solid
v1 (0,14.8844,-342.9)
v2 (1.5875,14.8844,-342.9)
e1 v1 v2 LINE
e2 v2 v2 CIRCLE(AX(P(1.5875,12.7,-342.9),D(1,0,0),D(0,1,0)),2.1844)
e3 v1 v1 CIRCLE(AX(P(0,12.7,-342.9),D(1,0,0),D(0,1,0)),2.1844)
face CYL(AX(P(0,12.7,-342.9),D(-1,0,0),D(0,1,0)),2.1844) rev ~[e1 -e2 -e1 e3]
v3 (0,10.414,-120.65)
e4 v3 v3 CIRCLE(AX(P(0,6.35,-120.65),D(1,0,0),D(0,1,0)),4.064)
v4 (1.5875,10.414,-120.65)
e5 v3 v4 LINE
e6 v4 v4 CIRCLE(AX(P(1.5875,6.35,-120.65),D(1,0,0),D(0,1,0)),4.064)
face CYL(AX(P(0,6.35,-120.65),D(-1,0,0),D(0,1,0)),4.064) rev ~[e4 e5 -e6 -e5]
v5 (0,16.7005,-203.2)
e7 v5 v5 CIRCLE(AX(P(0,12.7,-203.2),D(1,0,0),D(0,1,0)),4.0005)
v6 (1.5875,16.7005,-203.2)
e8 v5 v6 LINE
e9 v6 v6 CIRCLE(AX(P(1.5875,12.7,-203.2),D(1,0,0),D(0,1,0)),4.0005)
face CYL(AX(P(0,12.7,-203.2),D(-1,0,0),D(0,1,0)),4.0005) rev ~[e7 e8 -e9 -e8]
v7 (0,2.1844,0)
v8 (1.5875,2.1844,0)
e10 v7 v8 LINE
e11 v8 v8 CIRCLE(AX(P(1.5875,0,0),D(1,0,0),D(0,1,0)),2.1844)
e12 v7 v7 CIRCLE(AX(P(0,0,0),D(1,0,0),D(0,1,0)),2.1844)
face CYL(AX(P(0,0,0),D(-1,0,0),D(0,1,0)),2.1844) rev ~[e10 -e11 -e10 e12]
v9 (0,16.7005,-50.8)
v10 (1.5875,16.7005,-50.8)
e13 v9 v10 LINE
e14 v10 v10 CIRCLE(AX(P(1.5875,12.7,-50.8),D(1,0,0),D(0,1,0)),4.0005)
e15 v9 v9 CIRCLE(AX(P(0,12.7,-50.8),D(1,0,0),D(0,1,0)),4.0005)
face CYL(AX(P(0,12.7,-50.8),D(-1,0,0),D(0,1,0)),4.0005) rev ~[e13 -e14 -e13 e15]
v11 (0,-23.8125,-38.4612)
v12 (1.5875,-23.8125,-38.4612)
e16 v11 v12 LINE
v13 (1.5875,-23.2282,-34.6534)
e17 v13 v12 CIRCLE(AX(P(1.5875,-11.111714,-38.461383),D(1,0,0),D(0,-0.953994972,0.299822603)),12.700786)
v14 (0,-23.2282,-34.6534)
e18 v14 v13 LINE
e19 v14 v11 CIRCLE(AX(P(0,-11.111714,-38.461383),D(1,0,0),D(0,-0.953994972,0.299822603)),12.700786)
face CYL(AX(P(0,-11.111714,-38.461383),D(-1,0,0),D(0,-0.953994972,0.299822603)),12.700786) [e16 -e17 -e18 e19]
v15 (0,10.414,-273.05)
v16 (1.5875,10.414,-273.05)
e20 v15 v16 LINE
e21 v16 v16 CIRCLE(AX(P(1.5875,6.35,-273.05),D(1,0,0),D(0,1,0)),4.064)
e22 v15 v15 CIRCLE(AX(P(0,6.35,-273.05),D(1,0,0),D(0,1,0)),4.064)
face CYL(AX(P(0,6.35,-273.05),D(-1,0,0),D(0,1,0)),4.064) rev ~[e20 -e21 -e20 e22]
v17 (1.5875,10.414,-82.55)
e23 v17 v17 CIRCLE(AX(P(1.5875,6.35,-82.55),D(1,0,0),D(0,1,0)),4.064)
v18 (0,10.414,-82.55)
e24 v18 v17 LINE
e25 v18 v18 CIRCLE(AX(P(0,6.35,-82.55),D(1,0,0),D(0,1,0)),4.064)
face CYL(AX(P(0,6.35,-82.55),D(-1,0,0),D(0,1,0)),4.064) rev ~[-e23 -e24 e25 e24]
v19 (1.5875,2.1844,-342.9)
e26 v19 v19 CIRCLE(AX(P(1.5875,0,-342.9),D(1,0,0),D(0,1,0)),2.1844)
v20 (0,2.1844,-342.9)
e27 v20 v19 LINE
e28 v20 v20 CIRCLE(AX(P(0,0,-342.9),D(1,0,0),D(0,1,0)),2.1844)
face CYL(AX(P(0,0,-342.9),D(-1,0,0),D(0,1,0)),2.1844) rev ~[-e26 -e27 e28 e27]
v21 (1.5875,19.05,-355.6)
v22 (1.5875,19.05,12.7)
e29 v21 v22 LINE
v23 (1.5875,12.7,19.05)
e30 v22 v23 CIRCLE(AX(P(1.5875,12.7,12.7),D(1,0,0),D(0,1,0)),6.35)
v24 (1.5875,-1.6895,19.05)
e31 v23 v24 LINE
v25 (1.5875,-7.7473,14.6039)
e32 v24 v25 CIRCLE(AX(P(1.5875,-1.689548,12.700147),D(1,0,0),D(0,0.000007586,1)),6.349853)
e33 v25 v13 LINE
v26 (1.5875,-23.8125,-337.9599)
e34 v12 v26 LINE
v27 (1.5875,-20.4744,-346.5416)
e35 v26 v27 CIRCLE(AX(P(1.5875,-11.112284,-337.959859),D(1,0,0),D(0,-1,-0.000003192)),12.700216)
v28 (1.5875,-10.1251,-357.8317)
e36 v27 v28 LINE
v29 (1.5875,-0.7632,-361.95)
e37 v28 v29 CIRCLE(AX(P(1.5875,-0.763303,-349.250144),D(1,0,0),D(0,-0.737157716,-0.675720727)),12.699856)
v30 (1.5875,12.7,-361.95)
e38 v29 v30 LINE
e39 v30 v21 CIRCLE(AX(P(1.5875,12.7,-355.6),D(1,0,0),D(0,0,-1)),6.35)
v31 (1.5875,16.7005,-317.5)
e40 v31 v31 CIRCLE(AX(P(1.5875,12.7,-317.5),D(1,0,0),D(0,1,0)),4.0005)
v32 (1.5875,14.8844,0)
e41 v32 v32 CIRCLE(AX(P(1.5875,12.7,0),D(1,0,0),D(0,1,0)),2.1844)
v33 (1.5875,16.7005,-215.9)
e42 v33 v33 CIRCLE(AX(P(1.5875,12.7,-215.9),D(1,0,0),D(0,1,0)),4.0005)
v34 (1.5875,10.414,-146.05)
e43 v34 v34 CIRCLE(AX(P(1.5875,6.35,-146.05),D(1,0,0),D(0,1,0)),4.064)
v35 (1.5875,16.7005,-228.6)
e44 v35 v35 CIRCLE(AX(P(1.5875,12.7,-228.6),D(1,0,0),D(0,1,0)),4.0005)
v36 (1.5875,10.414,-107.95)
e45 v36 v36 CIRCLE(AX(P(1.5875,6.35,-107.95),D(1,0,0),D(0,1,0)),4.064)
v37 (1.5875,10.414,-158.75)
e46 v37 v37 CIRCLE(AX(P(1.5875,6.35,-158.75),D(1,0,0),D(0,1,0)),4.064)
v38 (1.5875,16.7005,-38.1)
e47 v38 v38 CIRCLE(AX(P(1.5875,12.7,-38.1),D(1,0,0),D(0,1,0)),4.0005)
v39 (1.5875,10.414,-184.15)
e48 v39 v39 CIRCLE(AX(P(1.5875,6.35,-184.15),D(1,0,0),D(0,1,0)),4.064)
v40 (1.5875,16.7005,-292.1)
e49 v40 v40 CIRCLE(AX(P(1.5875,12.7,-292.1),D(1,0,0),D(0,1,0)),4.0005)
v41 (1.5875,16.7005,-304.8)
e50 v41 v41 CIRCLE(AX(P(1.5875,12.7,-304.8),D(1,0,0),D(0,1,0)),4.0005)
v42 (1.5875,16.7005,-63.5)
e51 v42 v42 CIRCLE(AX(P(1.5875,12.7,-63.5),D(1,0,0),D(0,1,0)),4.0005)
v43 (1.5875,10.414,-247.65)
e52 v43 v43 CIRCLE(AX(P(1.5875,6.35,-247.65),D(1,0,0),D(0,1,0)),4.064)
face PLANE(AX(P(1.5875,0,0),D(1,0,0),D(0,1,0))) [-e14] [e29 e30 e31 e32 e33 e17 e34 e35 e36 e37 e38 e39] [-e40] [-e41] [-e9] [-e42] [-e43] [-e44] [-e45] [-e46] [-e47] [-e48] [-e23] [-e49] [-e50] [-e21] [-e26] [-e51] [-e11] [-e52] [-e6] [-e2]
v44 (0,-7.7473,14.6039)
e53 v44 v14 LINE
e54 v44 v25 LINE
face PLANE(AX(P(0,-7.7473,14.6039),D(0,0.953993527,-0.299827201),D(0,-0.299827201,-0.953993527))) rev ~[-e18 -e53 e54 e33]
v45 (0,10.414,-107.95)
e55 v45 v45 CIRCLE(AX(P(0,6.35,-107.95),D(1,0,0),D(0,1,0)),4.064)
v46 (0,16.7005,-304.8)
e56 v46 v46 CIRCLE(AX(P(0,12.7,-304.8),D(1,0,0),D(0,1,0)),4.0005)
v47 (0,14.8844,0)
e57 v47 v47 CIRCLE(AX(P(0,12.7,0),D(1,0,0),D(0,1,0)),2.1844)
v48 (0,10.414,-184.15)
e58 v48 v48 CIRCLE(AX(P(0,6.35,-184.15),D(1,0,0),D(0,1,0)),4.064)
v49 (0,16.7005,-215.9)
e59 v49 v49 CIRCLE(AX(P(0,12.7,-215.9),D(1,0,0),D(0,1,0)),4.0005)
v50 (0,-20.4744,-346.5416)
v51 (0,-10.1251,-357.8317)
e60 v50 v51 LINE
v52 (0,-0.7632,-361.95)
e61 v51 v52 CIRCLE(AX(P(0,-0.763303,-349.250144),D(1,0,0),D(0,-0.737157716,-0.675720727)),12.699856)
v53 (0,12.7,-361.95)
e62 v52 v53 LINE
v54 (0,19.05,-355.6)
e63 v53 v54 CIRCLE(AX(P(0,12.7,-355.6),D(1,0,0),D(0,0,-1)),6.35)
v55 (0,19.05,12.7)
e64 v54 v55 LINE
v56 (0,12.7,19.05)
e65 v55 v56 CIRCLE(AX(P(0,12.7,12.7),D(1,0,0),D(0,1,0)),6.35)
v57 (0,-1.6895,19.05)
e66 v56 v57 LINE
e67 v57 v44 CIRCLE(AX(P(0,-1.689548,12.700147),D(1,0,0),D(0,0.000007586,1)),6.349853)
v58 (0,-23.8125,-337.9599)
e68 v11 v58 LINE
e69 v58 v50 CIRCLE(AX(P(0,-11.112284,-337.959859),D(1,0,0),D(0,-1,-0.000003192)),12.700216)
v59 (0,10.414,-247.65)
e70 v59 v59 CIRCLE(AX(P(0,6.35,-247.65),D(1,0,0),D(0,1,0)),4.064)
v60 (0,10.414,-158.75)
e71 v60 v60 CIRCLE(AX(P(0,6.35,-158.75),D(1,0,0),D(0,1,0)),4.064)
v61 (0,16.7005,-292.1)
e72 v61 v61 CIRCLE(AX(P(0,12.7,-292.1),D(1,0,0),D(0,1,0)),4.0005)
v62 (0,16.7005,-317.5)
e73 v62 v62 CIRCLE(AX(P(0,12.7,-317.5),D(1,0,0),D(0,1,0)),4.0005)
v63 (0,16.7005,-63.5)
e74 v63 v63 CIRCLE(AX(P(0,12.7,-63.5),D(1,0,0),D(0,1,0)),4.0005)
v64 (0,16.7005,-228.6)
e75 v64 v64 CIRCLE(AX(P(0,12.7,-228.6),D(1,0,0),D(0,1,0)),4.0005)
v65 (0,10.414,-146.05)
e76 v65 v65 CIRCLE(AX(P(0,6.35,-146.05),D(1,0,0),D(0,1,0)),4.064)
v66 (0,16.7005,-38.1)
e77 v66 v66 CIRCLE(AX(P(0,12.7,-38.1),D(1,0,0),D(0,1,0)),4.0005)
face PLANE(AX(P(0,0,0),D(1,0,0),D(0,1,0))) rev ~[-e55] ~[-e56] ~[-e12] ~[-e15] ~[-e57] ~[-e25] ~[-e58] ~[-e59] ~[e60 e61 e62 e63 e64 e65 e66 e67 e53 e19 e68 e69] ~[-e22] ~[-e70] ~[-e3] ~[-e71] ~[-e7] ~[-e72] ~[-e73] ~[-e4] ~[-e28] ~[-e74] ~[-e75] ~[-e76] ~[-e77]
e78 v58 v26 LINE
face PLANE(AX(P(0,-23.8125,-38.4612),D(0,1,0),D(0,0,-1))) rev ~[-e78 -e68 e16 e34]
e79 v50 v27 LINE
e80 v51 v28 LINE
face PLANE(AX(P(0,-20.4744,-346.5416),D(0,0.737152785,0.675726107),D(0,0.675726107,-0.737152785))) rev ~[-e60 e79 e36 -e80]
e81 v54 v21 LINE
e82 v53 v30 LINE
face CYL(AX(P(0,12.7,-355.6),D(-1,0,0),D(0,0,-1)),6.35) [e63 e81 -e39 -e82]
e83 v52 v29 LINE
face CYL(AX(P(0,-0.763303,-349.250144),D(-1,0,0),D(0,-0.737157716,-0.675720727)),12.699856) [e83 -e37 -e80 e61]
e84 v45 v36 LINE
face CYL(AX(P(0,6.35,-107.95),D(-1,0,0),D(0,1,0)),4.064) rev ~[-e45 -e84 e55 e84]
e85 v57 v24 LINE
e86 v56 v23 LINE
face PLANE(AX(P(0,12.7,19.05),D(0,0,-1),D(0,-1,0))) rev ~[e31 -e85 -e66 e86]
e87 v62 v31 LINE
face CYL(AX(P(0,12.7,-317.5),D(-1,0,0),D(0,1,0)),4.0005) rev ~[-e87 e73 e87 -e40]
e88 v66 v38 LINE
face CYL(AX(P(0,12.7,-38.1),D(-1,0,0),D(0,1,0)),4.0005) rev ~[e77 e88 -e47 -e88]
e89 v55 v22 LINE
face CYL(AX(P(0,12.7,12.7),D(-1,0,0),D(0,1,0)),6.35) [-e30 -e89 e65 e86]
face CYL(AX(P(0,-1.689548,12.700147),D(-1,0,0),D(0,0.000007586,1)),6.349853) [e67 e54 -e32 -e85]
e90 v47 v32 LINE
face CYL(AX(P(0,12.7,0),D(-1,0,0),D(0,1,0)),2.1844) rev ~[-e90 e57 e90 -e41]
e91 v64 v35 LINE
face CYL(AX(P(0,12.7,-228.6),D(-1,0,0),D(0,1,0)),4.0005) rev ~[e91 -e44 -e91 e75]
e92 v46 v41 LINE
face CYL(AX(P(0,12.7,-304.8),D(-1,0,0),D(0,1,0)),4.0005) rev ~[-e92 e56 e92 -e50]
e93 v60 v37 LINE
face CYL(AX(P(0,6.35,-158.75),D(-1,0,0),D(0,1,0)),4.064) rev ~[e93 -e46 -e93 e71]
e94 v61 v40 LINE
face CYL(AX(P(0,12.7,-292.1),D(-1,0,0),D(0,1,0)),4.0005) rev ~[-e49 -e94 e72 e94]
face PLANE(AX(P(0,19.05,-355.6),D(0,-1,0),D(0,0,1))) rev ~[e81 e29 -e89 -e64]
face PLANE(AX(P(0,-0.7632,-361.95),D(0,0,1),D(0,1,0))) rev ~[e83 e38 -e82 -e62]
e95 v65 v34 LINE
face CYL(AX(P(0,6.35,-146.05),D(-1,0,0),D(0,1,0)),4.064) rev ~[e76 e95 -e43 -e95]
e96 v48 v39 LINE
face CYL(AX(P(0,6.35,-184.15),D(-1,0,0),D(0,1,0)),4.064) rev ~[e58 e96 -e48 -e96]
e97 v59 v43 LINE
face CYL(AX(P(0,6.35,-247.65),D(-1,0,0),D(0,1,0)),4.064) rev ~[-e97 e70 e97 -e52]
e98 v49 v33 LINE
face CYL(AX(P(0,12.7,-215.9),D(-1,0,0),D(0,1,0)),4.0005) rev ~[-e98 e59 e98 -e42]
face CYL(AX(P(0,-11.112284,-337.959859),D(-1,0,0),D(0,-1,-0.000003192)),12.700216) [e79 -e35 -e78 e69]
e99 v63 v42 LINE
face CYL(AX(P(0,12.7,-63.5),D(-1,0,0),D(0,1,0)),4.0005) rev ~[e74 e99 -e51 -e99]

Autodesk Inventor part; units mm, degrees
ref_plane "YZ Plane" through (0, 0, 0) normal (1, 0, 0) x (0, 1, 0)
ref_plane "XZ Plane" through (0, 0, 0) normal (0, 1, 0) x (-1, 0, 0)
ref_plane "XY Plane" through (0, 0, 0) normal (0, 0, 1) x (1, 0, 0)
sketch "main" plane through (0, 0, 0) normal (0, 0, 1) x (1, 0, 0)
  circle A0 centre (10.1168, 23.8511) radius 4.064
  circle A1 centre (10.1168, 11.1511) radius 4.064
  circle A2 centre (10.1168, -14.2489) radius 4.064
  circle A3 centre (16.4668, -33.2989) radius 4.0005
  circle A4 centre (16.4668, -58.6989) radius 4.0005
  circle A5 centre (10.1168, -77.7489) radius 4.064
  circle A6 centre (3.7668, 169.9011) radius 2.1844
  circle A7 centre (16.4668, 169.9011) radius 2.1844
  circle A8 centre (10.1168, -103.1489) radius 4.064
  circle A9 centre (16.4668, -122.1989) radius 4.0005
  circle A10 centre (3.7668, -172.9989) radius 2.1844
  circle A11 centre (16.4668, -172.9989) radius 2.1844
  line L0 (-20.0457, 131.4398) -> (-20.0457, -168.0589)
  line L1 (22.8168, -185.6989) -> (22.8168, 182.6011)
  line L2 (-16.7075, -176.6406) -> (-6.3583, -187.9307)
  line L3 (3.0036, -192.0489) -> (16.4668, -192.0489)
  arc A12 (-20.0457, -168.0589) -> (-16.7075, -176.6406) centre (-7.3457, -168.0589) ccw
  arc A13 (-6.3583, -187.9307) -> (3.0036, -192.0489) centre (3.0036, -179.3489) ccw
  circle A14 centre (16.4668, -147.5989) radius 4.0005
  arc A15 (16.4668, -192.0489) -> (22.8168, -185.6989) centre (16.4668, -185.6989) ccw
  line L4 (16.4668, 188.9511) -> (2.0773, 188.9511)
  line L5 (-3.9805, 184.505) -> (-19.4614, 135.2476)
  arc A16 (-19.4614, 135.2476) -> (-20.0457, 131.4398) centre (-7.3457, 131.4398) ccw
  circle A17 centre (10.1168, 49.2511) radius 4.064
  circle A18 centre (10.1168, 61.9511) radius 4.064
  circle A19 centre (10.1168, 87.3511) radius 4.064
  circle A20 centre (16.4668, 106.4011) radius 4.0005
  circle A21 centre (16.4668, 131.8011) radius 4.0005
  arc A22 (22.8168, 182.6011) -> (16.4668, 188.9511) centre (16.4668, 182.6011) ccw
  arc A23 (2.0773, 188.9511) -> (-3.9805, 184.505) centre (2.0773, 182.6011) ccw
  circle A24 centre (16.4668, 119.1011) radius 4.0005
  circle A25 centre (16.4668, -45.9989) radius 4.0005
  circle A26 centre (16.4668, -134.8989) radius 4.0005
  point P0 (5.8318, -6.3003)
  dimension "d16" = 12.7
  dimension "d17" = 6.35
  dimension "d18" = 6.35
  dimension "d19" = 8.001
  dimension "d20" = 25.4
  dimension "d21" = 165.1
  dimension "d22" = 254
  dimension "d23" = 8.128
  dimension "d24" = 25.4
  dimension "d25" = 38.1
  dimension "d26" = 25.4
sketch "Sketch1" plane through (0, 0, 0) normal (1, 0, 0) x (0, 1, 0)
  circle A0 centre (6.35, -146.05) radius 4.064
  circle A1 centre (6.35, -158.75) radius 4.064
  circle A2 centre (6.35, -184.15) radius 4.064
  circle A3 centre (12.7, -203.2) radius 4.0005
  circle A4 centre (12.7, -228.6) radius 4.0005
  circle A5 centre (6.35, -247.65) radius 4.064
  circle A6 centre (0, 0) radius 2.1844
  circle A7 centre (12.7, 0) radius 2.1844
  circle A8 centre (6.35, -273.05) radius 4.064
  circle A9 centre (12.7, -292.1) radius 4.0005
  circle A10 centre (0, -342.9) radius 2.1844
  circle A11 centre (12.7, -342.9) radius 2.1844
  line L0 (-23.8125, -38.4612) -> (-23.8125, -337.9599)
  line L1 (19.05, -355.6) -> (19.05, 12.7)
  line L2 (-20.4744, -346.5416) -> (-10.1251, -357.8317)
  line L3 (-0.7632, -361.95) -> (12.7, -361.95)
  arc A12 (-23.8125, -337.9599) -> (-20.4744, -346.5416) centre (-11.1125, -337.9599) ccw
  arc A13 (-10.1251, -357.8317) -> (-0.7632, -361.95) centre (-0.7632, -349.25) ccw
  circle A14 centre (12.7, -317.5) radius 4.0005
  arc A15 (12.7, -361.95) -> (19.05, -355.6) centre (12.7, -355.6) ccw
  line L4 (12.7, 19.05) -> (-1.6895, 19.05)
  line L5 (-7.7473, 14.6039) -> (-23.2282, -34.6534)
  arc A16 (-23.2282, -34.6534) -> (-23.8125, -38.4612) centre (-11.1125, -38.4612) ccw
  circle A17 centre (6.35, -120.65) radius 4.064
  circle A18 centre (6.35, -107.95) radius 4.064
  circle A19 centre (6.35, -82.55) radius 4.064
  circle A20 centre (12.7, -63.5) radius 4.0005
  circle A21 centre (12.7, -38.1) radius 4.0005
  arc A22 (19.05, 12.7) -> (12.7, 19.05) centre (12.7, 12.7) ccw
  arc A23 (-1.6895, 19.05) -> (-7.7473, 14.6039) centre (-1.6895, 12.7) ccw
  circle A24 centre (12.7, -50.8) radius 4.0005
  circle A25 centre (12.7, -215.9) radius 4.0005
  circle A26 centre (12.7, -304.8) radius 4.0005
extrude "Extrusion1" add sketch "Sketch1" along normal blind 1.5875
properties part number "Skirt" material "Acetal Resin, White"
